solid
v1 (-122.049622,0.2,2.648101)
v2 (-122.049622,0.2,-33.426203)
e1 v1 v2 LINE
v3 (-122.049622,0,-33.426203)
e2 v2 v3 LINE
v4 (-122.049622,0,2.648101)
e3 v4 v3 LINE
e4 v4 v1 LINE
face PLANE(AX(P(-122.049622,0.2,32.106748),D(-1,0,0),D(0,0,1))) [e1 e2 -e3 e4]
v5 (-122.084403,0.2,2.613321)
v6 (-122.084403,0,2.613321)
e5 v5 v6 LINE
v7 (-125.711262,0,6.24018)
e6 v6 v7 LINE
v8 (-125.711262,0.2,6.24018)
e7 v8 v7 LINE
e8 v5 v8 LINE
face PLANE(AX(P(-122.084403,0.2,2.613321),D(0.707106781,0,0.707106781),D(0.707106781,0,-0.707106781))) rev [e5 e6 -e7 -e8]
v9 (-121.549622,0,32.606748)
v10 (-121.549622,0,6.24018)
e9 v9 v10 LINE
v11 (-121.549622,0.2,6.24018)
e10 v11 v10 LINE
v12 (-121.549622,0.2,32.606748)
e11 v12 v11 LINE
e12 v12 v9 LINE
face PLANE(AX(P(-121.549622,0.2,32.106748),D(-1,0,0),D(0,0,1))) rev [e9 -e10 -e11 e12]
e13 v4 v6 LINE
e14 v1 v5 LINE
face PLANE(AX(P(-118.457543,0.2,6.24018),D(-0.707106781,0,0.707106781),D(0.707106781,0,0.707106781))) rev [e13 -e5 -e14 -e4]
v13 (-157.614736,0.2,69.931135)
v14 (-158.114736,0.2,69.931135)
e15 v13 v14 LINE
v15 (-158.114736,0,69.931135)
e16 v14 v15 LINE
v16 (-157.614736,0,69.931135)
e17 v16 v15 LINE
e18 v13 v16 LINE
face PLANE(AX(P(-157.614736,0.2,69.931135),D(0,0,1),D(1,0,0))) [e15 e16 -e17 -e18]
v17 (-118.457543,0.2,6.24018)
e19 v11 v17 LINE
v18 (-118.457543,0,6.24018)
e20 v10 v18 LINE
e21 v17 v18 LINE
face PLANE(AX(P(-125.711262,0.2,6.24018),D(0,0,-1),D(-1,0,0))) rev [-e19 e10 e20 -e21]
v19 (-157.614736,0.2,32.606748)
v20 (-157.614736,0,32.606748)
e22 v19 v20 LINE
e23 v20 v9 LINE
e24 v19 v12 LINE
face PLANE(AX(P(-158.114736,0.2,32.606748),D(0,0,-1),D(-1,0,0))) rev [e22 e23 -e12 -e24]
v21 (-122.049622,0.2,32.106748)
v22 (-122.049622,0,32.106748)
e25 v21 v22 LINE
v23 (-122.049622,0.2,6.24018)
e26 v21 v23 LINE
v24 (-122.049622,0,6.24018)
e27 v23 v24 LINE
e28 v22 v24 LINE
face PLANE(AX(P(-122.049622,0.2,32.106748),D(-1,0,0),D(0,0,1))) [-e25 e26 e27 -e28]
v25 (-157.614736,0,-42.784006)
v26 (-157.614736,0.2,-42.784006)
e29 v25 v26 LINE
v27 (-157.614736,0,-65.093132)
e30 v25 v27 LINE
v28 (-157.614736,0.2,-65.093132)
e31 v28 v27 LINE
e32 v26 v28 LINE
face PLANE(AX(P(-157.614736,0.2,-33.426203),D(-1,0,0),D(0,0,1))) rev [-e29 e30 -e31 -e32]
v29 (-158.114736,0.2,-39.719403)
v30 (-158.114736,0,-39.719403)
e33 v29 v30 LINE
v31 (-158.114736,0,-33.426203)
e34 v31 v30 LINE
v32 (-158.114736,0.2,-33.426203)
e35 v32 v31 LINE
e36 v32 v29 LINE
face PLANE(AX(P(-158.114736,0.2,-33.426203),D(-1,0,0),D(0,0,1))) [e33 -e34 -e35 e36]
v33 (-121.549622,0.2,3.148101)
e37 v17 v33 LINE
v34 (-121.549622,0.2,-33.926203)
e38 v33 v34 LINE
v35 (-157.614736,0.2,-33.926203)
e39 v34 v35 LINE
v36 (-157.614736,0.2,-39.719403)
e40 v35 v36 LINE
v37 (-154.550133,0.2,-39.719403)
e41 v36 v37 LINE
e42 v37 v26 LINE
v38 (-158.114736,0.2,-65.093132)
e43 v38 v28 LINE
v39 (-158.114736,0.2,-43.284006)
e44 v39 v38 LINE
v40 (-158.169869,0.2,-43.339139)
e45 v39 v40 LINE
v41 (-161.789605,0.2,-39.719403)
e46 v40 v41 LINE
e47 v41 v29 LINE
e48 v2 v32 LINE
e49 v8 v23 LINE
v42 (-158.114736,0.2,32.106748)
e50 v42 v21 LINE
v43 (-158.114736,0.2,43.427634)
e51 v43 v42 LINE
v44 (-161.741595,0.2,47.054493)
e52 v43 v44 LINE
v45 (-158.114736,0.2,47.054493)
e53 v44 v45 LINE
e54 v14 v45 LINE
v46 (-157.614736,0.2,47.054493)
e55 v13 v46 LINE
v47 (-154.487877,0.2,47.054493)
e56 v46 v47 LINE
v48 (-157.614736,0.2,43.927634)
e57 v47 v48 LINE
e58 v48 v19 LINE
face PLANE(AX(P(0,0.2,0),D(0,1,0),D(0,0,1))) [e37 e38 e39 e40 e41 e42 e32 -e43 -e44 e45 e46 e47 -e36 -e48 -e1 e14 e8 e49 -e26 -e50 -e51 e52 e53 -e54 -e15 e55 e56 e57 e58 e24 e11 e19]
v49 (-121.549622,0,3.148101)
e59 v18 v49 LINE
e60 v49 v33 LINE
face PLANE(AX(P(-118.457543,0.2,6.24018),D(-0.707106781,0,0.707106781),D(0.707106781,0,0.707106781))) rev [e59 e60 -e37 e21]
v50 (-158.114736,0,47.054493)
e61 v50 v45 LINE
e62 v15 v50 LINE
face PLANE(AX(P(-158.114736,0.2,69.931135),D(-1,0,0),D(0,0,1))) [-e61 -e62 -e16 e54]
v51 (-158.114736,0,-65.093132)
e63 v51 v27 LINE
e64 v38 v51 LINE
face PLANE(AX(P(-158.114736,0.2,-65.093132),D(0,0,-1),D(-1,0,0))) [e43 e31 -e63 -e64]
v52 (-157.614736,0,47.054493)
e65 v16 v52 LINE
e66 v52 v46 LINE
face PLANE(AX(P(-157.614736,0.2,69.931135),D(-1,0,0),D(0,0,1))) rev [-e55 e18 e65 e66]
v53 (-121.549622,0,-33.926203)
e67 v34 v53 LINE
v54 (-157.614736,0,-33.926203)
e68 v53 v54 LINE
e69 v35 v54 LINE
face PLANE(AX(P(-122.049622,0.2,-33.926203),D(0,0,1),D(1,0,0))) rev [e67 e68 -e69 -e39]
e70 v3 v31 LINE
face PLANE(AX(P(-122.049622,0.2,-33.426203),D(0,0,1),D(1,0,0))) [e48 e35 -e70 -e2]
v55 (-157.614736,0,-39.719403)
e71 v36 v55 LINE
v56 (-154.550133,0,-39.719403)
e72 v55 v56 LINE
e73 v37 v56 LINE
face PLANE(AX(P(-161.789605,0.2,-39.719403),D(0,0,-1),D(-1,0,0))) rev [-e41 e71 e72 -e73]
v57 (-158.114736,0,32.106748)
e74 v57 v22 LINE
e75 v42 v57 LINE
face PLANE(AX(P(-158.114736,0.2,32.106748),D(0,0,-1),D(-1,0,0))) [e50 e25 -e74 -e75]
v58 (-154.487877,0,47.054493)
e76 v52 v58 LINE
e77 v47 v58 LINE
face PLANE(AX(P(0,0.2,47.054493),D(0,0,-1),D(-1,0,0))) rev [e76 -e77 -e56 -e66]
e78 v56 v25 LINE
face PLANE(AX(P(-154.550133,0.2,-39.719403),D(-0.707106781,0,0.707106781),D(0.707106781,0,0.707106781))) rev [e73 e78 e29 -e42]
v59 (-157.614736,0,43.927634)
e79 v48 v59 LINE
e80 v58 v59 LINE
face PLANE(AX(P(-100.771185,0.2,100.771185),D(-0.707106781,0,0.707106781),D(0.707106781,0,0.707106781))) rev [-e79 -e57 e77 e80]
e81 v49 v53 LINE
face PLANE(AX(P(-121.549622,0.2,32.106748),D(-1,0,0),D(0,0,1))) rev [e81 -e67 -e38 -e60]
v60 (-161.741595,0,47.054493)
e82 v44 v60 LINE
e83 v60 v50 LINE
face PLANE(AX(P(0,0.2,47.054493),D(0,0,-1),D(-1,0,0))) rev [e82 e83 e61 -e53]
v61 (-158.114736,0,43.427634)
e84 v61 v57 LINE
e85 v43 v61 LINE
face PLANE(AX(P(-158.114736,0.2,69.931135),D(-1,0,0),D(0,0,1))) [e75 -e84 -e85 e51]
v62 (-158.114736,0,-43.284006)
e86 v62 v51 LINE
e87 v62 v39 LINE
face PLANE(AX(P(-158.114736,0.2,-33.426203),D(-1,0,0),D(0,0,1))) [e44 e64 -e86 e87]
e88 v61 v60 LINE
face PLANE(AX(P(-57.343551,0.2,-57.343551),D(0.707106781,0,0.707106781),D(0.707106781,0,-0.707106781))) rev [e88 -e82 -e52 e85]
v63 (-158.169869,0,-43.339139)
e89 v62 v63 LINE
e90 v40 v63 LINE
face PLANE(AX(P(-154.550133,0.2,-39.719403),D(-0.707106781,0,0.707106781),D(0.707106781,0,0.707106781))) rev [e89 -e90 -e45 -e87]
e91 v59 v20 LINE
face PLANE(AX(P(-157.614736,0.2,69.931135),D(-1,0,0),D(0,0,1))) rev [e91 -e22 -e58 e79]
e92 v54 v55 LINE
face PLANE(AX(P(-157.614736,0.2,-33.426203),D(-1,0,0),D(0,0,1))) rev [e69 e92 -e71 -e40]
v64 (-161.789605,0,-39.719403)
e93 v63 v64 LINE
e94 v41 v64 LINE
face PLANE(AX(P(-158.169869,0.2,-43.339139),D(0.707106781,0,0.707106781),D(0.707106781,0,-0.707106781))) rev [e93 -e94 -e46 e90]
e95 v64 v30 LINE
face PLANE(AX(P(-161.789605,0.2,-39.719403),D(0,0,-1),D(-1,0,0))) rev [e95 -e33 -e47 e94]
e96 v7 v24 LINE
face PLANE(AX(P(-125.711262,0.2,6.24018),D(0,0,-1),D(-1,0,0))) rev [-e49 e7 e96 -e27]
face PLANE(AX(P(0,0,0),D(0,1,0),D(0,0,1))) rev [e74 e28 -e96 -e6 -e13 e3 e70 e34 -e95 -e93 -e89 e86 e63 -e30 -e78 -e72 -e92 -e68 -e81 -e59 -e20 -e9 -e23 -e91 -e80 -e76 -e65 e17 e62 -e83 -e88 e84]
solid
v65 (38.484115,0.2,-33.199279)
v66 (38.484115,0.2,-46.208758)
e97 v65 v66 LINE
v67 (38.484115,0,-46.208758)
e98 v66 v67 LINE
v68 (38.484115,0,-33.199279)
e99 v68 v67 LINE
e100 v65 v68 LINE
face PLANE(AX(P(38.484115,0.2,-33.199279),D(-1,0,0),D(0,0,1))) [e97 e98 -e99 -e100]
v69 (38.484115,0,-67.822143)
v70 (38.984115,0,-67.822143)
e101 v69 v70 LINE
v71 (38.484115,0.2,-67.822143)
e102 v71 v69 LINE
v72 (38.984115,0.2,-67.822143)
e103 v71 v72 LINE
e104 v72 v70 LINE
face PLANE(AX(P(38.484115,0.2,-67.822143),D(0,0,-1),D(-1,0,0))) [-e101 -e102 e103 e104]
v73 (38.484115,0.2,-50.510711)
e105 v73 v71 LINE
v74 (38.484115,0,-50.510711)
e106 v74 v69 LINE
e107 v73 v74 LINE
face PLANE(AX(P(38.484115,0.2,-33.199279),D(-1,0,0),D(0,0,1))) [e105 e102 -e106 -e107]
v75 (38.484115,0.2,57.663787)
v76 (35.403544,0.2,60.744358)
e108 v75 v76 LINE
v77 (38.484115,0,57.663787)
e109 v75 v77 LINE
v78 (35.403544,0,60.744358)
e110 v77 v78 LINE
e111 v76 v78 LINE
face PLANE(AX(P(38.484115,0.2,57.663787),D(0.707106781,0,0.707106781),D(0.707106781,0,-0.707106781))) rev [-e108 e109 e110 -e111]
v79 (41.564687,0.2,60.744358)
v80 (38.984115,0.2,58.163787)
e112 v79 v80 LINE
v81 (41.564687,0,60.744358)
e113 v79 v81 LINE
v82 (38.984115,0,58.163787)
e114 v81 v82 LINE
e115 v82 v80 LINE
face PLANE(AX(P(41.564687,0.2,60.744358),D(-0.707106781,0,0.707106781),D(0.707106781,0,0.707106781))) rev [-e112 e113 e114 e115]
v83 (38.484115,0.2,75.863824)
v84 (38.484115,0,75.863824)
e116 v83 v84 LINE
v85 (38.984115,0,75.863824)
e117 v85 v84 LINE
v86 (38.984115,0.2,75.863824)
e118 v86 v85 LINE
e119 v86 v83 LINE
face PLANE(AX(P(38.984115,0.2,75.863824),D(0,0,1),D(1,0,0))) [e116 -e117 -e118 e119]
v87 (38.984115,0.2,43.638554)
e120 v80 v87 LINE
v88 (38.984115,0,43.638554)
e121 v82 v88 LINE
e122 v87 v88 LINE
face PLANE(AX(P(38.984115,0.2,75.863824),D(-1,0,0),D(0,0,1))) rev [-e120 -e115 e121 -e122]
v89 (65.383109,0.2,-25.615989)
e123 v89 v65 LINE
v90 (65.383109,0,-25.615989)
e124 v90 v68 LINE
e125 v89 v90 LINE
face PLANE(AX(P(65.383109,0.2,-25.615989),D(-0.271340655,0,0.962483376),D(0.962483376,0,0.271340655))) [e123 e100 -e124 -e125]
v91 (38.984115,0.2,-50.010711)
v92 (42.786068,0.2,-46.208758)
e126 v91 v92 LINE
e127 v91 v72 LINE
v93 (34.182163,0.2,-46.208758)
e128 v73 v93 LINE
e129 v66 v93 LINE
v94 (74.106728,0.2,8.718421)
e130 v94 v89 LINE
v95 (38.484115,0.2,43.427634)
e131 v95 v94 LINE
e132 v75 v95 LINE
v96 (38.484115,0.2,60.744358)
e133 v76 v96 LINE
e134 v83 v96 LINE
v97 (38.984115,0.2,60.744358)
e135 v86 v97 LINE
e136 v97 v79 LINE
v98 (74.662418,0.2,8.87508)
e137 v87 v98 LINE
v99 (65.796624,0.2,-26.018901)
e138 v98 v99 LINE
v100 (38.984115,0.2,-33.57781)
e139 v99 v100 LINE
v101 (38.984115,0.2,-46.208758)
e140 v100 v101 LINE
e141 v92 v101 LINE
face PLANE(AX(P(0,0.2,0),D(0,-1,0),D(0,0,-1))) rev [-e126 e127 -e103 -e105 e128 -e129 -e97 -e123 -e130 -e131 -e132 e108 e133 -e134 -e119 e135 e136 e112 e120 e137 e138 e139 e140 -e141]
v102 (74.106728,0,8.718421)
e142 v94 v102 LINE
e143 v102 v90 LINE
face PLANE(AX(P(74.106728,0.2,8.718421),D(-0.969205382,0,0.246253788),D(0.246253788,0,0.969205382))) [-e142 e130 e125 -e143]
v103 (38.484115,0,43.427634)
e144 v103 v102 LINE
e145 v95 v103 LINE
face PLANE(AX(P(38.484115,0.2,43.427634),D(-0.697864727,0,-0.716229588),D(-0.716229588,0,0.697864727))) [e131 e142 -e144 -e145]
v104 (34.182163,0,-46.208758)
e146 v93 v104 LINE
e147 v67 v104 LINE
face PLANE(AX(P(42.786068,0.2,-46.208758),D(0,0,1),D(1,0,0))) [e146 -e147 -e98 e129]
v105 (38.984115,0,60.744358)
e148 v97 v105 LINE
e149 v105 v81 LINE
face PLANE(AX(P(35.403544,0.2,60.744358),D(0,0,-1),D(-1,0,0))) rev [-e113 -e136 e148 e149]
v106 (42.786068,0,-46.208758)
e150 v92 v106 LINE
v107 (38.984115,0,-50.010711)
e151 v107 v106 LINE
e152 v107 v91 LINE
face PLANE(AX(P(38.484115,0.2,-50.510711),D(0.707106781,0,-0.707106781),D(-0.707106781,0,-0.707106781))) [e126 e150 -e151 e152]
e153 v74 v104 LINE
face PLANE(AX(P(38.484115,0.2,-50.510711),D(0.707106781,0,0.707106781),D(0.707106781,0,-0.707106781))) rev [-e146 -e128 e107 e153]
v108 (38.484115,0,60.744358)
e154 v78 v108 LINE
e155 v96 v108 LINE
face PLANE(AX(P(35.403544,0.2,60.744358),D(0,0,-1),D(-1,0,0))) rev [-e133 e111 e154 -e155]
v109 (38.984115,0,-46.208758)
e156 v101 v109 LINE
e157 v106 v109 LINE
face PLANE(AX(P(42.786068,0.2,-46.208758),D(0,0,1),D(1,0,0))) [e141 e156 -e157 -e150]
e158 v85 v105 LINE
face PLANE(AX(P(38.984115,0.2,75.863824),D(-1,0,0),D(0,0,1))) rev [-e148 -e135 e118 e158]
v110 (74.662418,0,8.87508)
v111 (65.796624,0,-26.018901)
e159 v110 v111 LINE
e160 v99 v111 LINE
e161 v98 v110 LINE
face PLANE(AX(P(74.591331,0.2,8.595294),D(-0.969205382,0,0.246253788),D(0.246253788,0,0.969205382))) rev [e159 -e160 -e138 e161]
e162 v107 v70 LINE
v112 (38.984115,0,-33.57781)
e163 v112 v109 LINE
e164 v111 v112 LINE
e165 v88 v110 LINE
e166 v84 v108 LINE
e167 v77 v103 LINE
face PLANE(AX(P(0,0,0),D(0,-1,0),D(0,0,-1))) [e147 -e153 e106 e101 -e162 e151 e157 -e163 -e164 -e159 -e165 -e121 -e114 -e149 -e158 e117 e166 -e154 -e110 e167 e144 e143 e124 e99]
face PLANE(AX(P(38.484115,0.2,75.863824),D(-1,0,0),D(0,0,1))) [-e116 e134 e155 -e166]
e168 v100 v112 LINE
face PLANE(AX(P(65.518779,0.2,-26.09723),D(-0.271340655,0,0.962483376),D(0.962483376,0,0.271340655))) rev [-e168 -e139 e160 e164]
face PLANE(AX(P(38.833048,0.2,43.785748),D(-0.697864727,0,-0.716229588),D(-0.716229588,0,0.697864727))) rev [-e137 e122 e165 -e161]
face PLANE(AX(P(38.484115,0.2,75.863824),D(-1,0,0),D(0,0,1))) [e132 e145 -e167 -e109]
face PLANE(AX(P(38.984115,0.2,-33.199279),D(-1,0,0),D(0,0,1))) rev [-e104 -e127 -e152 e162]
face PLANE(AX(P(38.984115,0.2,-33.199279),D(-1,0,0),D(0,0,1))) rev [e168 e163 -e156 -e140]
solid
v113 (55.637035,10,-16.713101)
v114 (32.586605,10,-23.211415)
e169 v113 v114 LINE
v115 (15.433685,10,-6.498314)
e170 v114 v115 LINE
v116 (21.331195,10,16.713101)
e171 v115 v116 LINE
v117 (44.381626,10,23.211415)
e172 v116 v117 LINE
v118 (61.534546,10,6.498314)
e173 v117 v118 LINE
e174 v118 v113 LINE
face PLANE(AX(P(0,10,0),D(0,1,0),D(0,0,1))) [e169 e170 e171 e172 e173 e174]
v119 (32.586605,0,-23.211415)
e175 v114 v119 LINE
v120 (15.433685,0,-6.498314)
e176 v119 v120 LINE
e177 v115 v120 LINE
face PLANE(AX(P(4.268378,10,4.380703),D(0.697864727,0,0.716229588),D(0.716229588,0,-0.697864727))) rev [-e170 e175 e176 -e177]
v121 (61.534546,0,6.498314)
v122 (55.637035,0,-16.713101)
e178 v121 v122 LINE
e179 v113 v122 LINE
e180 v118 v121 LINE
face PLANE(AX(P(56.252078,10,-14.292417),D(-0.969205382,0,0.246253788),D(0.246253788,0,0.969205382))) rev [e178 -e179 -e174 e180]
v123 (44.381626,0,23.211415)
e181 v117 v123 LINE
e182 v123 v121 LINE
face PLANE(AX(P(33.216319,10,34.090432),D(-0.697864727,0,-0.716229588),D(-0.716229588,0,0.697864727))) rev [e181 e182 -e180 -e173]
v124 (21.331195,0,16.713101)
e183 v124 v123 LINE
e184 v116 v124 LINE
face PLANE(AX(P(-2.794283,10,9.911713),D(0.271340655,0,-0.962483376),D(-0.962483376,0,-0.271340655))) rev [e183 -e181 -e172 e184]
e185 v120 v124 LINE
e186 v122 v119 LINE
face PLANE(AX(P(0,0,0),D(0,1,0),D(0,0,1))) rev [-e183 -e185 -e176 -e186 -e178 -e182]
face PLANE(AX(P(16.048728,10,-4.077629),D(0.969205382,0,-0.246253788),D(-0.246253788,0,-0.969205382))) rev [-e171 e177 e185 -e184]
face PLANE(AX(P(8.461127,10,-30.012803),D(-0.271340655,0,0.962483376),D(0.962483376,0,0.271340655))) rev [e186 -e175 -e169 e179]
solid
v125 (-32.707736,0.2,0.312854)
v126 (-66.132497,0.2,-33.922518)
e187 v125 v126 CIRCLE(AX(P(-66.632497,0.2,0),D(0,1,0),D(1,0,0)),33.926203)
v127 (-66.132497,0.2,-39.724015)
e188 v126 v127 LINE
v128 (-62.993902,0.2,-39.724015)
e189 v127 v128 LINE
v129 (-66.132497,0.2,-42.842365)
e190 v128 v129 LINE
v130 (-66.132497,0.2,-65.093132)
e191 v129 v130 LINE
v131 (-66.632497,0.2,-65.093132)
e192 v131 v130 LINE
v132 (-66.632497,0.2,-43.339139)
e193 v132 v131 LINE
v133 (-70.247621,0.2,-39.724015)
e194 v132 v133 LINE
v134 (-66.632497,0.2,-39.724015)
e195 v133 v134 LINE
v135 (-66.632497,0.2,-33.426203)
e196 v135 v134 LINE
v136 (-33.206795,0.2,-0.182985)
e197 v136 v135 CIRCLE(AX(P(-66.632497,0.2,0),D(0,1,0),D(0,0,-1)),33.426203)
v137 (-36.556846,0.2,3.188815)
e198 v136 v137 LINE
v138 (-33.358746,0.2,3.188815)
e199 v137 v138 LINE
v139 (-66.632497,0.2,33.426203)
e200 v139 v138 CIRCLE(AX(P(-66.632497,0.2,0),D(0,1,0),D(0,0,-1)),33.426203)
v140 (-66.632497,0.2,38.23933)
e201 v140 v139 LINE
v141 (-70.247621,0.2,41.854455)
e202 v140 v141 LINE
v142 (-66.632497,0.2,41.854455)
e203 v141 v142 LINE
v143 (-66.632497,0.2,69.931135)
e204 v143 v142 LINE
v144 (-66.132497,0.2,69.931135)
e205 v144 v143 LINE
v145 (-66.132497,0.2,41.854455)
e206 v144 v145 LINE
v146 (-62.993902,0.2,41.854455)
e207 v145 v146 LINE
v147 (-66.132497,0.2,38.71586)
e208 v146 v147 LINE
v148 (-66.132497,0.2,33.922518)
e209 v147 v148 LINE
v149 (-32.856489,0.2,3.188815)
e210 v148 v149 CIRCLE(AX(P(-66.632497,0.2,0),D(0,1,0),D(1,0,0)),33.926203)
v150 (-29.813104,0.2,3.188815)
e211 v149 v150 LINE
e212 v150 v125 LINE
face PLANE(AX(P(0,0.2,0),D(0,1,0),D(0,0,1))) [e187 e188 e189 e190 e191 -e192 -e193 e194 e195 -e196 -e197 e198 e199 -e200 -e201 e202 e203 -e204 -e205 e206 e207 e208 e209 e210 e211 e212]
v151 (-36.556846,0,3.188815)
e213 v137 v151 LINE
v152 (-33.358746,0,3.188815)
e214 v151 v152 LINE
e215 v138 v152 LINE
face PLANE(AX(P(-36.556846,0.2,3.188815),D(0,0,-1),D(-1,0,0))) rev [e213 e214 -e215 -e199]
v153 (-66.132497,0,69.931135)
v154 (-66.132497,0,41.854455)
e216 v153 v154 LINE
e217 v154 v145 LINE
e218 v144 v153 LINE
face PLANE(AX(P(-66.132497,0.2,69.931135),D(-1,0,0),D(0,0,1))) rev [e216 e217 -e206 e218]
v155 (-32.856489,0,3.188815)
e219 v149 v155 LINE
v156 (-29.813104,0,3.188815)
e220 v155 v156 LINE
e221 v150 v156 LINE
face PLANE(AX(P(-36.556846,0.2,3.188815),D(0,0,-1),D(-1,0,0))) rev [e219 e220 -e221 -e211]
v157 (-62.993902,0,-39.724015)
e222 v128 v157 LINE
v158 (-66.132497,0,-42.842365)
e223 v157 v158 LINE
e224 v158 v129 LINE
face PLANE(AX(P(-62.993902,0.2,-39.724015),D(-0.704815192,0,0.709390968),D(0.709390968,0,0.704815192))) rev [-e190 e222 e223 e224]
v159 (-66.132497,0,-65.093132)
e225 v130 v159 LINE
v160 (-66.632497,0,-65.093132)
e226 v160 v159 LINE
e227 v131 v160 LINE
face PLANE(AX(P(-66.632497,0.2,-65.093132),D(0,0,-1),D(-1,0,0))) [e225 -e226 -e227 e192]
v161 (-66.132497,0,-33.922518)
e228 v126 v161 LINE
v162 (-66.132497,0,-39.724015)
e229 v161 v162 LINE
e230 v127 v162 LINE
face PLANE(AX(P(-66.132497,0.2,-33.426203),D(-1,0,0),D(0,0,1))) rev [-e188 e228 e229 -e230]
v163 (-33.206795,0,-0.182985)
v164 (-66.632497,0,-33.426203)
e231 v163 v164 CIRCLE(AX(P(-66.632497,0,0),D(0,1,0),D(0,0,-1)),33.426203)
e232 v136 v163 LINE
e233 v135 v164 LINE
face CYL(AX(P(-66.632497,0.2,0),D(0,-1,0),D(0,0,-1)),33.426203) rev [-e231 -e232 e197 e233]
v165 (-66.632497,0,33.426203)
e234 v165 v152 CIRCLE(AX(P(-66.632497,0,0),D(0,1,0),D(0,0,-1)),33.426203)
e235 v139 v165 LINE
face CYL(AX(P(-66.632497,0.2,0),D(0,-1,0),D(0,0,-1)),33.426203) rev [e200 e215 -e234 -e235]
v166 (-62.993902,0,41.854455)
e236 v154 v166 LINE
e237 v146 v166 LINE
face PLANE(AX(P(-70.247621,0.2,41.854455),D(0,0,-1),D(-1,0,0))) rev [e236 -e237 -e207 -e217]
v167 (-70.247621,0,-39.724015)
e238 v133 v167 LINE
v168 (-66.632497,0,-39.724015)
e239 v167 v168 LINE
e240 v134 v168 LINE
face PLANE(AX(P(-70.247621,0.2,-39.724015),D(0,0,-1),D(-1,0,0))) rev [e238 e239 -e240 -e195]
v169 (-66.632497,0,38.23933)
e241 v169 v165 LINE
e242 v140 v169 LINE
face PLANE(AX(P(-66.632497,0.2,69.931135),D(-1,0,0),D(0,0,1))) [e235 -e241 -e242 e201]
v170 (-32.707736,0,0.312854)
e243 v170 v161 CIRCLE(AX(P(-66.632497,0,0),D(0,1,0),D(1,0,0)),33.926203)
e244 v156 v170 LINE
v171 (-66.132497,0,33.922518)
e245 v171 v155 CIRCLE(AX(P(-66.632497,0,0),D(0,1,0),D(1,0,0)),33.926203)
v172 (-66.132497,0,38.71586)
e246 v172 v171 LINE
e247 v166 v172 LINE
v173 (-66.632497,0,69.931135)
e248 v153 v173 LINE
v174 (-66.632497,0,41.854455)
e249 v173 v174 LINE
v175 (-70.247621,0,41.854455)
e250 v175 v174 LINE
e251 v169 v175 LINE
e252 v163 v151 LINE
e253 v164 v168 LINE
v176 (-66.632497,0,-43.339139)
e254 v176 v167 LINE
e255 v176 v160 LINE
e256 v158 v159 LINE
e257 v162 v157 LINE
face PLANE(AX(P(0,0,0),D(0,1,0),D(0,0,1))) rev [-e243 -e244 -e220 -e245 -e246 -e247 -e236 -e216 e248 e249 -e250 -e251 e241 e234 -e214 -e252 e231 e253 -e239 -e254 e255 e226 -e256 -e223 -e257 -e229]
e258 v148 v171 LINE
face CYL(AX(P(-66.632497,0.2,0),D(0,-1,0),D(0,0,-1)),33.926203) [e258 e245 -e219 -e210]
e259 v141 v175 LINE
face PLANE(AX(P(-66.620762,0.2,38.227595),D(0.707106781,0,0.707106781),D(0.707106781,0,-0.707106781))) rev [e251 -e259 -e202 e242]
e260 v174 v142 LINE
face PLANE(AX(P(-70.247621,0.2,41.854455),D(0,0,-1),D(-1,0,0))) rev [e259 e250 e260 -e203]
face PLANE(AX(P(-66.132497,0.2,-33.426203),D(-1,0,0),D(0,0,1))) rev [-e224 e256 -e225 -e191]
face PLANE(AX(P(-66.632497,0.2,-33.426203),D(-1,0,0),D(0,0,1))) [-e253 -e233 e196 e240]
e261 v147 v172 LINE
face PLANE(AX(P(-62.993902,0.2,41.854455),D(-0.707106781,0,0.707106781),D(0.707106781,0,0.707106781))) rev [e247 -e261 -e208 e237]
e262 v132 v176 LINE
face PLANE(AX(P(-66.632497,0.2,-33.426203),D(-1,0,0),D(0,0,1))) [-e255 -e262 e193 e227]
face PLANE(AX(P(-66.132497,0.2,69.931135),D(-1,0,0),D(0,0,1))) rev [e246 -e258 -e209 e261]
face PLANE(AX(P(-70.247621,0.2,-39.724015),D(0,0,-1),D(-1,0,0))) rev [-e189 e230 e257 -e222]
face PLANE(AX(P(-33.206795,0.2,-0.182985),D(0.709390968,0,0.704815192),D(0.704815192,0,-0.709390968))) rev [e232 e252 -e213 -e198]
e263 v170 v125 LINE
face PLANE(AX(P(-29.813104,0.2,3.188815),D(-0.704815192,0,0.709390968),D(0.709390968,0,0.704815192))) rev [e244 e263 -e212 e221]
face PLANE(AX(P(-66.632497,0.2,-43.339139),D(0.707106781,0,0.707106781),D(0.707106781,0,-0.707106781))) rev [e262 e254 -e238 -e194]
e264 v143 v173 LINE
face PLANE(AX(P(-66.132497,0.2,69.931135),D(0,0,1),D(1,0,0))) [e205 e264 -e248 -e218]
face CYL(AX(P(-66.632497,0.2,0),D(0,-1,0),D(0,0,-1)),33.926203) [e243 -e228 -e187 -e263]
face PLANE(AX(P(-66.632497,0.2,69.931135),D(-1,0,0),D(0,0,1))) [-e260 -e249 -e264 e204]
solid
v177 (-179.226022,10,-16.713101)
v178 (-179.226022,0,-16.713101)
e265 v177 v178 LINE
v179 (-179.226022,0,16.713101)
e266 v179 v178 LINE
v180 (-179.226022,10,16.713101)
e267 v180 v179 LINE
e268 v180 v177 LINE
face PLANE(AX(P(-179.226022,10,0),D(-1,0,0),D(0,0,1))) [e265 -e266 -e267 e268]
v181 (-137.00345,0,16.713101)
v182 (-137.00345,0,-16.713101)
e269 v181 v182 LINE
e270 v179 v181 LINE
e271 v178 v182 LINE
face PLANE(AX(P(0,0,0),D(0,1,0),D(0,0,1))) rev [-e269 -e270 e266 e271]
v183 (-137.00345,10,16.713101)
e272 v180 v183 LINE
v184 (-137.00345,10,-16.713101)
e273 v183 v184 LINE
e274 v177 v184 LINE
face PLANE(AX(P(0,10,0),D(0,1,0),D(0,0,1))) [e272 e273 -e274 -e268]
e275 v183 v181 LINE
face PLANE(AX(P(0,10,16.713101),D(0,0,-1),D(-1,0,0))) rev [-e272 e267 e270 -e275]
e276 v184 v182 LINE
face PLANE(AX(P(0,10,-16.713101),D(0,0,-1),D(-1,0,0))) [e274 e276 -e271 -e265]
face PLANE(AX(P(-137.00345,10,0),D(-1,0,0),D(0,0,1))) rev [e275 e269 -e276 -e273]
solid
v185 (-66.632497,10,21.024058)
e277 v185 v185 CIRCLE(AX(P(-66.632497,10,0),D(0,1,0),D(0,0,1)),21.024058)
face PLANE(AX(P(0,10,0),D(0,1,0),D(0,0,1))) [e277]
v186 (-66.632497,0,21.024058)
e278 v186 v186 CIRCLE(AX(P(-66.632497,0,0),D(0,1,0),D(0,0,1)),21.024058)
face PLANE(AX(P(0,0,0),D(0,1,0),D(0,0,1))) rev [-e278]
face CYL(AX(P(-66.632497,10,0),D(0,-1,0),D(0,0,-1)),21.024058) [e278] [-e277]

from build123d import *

# Parameters (mm, degrees)
SKETCH1_W             = 42.222572062
SKETCH1_H             = 33.426202882
BOSS_EXTRUDE1_DEPTH   = 10
BOSS_EXTRUDE1_2_DEPTH = 10
SKETCH1_R             = 21.024058424
BOSS_EXTRUDE1_3_DEPTH = 10
BOSS_EXTRUDE3_DEPTH   = 0.2
BOSS_EXTRUDE3_2_DEPTH = 0.2
BOSS_EXTRUDE3_3_DEPTH = 0.2
BOSS_EXTRUDE3_4_DEPTH = 0.2
BOSS_EXTRUDE3_5_DEPTH = 0.2
BOSS_EXTRUDE3_6_DEPTH = 0.2
BOSS_EXTRUDE3_7_DEPTH = 0.2
BOSS_EXTRUDE3_8_DEPTH = 0.2
EXTRUDE_THIN1_DEPTH   = 0.2


with BuildPart() as part:
    # Sketch1 → Boss-Extrude1 (new body)
    with BuildSketch(Plane(origin=(0, 0, 0), x_dir=(1, 0, 0), z_dir=(0, 1, 0))):
        with Locations((-158.114736003, 0)):
            Rectangle(SKETCH1_W, SKETCH1_H)
    extrude(amount=BOSS_EXTRUDE1_DEPTH)


with BuildPart() as body_2:
    # Sketch1 → Boss-Extrude1 2 (new body)
    with BuildSketch(Plane(origin=(0, 0, 0), x_dir=(1, 0, 0), z_dir=(0, 1, 0))):
        Polygon((61.534545535, -6.498313662), (55.637035061, 16.713101441), (32.586604687, 23.211415103), (15.433684787, 6.498313662), (21.331195261, -16.713101441), (44.381625635, -23.211415103), align=None)
    extrude(amount=BOSS_EXTRUDE1_2_DEPTH)


with BuildPart() as body_3:
    # Sketch1 → Boss-Extrude1 3 (new body)
    with BuildSketch(Plane(origin=(0, 0, 0), x_dir=(1, 0, 0), z_dir=(0, 1, 0))):
        with Locations((-66.632496535, 0)):
            Circle(SKETCH1_R)
    extrude(amount=BOSS_EXTRUDE1_3_DEPTH)


with BuildPart() as body_4:
    # Sketch1<5> → Boss-Extrude3 (new body)
    with BuildSketch(Plane(origin=(0, 0, 0), x_dir=(1, 0, 0), z_dir=(0, 1, 0))):
        Polygon((-161.789605496, 39.719403423), (-154.550133398, 39.719403423), (-158.169869447, 43.339139472), align=None)
    extrude(amount=BOSS_EXTRUDE3_DEPTH)



with BuildPart() as body_5:
    # Sketch1<5> → Boss-Extrude3 2 (new body)
    with BuildSketch(Plane(origin=(0, 0, 0), x_dir=(1, 0, 0), z_dir=(0, 1, 0))):
        Polygon((-125.711262238, -6.240180357), (-118.457543425, -6.240180357), (-122.084402832, -2.61332095), align=None)
    extrude(amount=BOSS_EXTRUDE3_2_DEPTH)


with BuildPart() as body_6:
    # Sketch1<5> → Boss-Extrude3 3 (new body)
    with BuildSketch(Plane(origin=(0, 0, 0), x_dir=(1, 0, 0), z_dir=(0, 1, 0))):
        Polygon((-154.487876597, -47.054493097), (-158.114736003, -43.42763369), (-161.74159541, -47.054493097), align=None)
    extrude(amount=BOSS_EXTRUDE3_3_DEPTH)


with BuildPart() as body_7:
    # Sketch1<5> → Boss-Extrude3 4 (new body)
    with BuildSketch(Plane(origin=(0, 0, 0), x_dir=(1, 0, 0), z_dir=(0, 1, 0))):
        Polygon((-70.247620953, -41.854454505), (-62.993902139, -41.854454505), (-66.620761546, -38.227595098), align=None)
    extrude(amount=BOSS_EXTRUDE3_4_DEPTH)


with BuildPart() as body_8:
    # Sketch1<5> → Boss-Extrude3 5 (new body)
    with BuildSketch(Plane(origin=(0, 0, 0), x_dir=(1, 0, 0), z_dir=(0, 1, 0))):
        Polygon((-70.247620953, 39.724015055), (-62.993902139, 39.724015055), (-66.632496535, 43.339139472), align=None)
    extrude(amount=BOSS_EXTRUDE3_5_DEPTH)


with BuildPart() as body_9:
    # Sketch1<5> → Boss-Extrude3 6 (new body)
    with BuildSketch(Plane(origin=(0, 0, 0), x_dir=(1, 0, 0), z_dir=(0, 1, 0))):
        Polygon((-36.556845653, -3.188815019), (-29.813104019, -3.188815019), (-33.206794515, 0.182985198), align=None)
    extrude(amount=BOSS_EXTRUDE3_6_DEPTH)


with BuildPart() as body_10:
    # Sketch1<5> → Boss-Extrude3 7 (new body)
    with BuildSketch(Plane(origin=(0, 0, 0), x_dir=(1, 0, 0), z_dir=(0, 1, 0))):
        Polygon((34.182162541, 46.208758205), (42.786067781, 46.208758205), (38.484115161, 50.510710825), align=None)
    extrude(amount=BOSS_EXTRUDE3_7_DEPTH)


with BuildPart() as body_11:
    # Sketch1<5> → Boss-Extrude3 8 (new body)
    with BuildSketch(Plane(origin=(0, 0, 0), x_dir=(1, 0, 0), z_dir=(0, 1, 0))):
        Polygon((41.564686711, -60.744358452), (38.484115161, -57.663786901), (35.40354361, -60.744358452), align=None)
    extrude(amount=BOSS_EXTRUDE3_8_DEPTH)


with BuildPart() as body_4_1:
    add(body_4.part)

    add(body_5.part)  # Extrude-Thin1 merges body 5

    add(body_6.part)  # Extrude-Thin1 merges body 6

    add(body_7.part)  # Extrude-Thin1 merges body 7

    add(body_8.part)  # Extrude-Thin1 merges body 8

    add(body_9.part)  # Extrude-Thin1 merges body 9

    add(body_10.part)  # Extrude-Thin1 merges body 10

    add(body_11.part)  # Extrude-Thin1 merges body 11
    # Sketch1<6> → Extrude-Thin1 (add)
    with BuildSketch(Plane(origin=(0, 0, 0), x_dir=(1, 0, 0), z_dir=(0, 1, 0))):
        Polygon((-158.114736003, -69.931134978), (-158.114736003, -32.106747506), (-122.049622367, -32.106747506), (-122.049622367, 33.426202882), (-158.114736003, 33.426202882), (-158.114736003, 65.093131929), (-157.614736003, 65.093131929), (-157.614736003, 33.926202882), (-121.549622367, 33.926202882), (-121.549622367, -32.606747506), (-157.614736003, -32.606747506), (-157.614736003, -69.931134978), align=None)
        with BuildLine():
            Line((-66.632496535, -69.931134978), (-66.632496535, -33.426202882))
            ThreePointArc((-66.632496535, -33.426202882), (-33.206293653, 0), (-66.632496535, 33.426202882))
            Line((-66.632496535, 33.426202882), (-66.632496535, 65.093131929))
            Line((-66.632496535, 65.093131929), (-66.132496535, 65.093131929))
            Line((-66.132496535, 65.093131929), (-66.132496535, 33.922518215))
            ThreePointArc((-66.132496535, 33.922518215), (-32.706293653, 0), (-66.132496535, -33.922518215))
            Line((-66.132496535, -33.922518215), (-66.132496535, -69.931134978))
            Line((-66.132496535, -69.931134978), (-66.632496535, -69.931134978))
        make_face()
        Polygon((38.484115161, -75.86382441), (38.484115161, -43.42763369), (74.106727986, -8.718421193), (65.38310896, 25.615988777), (38.484115161, 33.199278809), (38.484115161, 67.82214284), (38.984115161, 67.82214284), (38.984115161, 33.577809682), (65.796624306, 26.018901165), (74.662418023, -8.875079793), (38.984115161, -43.638554377), (38.984115161, -75.86382441), align=None)
    extrude(amount=EXTRUDE_THIN1_DEPTH)


solid = Compound([part.part, body_2.part, body_3.part, body_4_1.part])
